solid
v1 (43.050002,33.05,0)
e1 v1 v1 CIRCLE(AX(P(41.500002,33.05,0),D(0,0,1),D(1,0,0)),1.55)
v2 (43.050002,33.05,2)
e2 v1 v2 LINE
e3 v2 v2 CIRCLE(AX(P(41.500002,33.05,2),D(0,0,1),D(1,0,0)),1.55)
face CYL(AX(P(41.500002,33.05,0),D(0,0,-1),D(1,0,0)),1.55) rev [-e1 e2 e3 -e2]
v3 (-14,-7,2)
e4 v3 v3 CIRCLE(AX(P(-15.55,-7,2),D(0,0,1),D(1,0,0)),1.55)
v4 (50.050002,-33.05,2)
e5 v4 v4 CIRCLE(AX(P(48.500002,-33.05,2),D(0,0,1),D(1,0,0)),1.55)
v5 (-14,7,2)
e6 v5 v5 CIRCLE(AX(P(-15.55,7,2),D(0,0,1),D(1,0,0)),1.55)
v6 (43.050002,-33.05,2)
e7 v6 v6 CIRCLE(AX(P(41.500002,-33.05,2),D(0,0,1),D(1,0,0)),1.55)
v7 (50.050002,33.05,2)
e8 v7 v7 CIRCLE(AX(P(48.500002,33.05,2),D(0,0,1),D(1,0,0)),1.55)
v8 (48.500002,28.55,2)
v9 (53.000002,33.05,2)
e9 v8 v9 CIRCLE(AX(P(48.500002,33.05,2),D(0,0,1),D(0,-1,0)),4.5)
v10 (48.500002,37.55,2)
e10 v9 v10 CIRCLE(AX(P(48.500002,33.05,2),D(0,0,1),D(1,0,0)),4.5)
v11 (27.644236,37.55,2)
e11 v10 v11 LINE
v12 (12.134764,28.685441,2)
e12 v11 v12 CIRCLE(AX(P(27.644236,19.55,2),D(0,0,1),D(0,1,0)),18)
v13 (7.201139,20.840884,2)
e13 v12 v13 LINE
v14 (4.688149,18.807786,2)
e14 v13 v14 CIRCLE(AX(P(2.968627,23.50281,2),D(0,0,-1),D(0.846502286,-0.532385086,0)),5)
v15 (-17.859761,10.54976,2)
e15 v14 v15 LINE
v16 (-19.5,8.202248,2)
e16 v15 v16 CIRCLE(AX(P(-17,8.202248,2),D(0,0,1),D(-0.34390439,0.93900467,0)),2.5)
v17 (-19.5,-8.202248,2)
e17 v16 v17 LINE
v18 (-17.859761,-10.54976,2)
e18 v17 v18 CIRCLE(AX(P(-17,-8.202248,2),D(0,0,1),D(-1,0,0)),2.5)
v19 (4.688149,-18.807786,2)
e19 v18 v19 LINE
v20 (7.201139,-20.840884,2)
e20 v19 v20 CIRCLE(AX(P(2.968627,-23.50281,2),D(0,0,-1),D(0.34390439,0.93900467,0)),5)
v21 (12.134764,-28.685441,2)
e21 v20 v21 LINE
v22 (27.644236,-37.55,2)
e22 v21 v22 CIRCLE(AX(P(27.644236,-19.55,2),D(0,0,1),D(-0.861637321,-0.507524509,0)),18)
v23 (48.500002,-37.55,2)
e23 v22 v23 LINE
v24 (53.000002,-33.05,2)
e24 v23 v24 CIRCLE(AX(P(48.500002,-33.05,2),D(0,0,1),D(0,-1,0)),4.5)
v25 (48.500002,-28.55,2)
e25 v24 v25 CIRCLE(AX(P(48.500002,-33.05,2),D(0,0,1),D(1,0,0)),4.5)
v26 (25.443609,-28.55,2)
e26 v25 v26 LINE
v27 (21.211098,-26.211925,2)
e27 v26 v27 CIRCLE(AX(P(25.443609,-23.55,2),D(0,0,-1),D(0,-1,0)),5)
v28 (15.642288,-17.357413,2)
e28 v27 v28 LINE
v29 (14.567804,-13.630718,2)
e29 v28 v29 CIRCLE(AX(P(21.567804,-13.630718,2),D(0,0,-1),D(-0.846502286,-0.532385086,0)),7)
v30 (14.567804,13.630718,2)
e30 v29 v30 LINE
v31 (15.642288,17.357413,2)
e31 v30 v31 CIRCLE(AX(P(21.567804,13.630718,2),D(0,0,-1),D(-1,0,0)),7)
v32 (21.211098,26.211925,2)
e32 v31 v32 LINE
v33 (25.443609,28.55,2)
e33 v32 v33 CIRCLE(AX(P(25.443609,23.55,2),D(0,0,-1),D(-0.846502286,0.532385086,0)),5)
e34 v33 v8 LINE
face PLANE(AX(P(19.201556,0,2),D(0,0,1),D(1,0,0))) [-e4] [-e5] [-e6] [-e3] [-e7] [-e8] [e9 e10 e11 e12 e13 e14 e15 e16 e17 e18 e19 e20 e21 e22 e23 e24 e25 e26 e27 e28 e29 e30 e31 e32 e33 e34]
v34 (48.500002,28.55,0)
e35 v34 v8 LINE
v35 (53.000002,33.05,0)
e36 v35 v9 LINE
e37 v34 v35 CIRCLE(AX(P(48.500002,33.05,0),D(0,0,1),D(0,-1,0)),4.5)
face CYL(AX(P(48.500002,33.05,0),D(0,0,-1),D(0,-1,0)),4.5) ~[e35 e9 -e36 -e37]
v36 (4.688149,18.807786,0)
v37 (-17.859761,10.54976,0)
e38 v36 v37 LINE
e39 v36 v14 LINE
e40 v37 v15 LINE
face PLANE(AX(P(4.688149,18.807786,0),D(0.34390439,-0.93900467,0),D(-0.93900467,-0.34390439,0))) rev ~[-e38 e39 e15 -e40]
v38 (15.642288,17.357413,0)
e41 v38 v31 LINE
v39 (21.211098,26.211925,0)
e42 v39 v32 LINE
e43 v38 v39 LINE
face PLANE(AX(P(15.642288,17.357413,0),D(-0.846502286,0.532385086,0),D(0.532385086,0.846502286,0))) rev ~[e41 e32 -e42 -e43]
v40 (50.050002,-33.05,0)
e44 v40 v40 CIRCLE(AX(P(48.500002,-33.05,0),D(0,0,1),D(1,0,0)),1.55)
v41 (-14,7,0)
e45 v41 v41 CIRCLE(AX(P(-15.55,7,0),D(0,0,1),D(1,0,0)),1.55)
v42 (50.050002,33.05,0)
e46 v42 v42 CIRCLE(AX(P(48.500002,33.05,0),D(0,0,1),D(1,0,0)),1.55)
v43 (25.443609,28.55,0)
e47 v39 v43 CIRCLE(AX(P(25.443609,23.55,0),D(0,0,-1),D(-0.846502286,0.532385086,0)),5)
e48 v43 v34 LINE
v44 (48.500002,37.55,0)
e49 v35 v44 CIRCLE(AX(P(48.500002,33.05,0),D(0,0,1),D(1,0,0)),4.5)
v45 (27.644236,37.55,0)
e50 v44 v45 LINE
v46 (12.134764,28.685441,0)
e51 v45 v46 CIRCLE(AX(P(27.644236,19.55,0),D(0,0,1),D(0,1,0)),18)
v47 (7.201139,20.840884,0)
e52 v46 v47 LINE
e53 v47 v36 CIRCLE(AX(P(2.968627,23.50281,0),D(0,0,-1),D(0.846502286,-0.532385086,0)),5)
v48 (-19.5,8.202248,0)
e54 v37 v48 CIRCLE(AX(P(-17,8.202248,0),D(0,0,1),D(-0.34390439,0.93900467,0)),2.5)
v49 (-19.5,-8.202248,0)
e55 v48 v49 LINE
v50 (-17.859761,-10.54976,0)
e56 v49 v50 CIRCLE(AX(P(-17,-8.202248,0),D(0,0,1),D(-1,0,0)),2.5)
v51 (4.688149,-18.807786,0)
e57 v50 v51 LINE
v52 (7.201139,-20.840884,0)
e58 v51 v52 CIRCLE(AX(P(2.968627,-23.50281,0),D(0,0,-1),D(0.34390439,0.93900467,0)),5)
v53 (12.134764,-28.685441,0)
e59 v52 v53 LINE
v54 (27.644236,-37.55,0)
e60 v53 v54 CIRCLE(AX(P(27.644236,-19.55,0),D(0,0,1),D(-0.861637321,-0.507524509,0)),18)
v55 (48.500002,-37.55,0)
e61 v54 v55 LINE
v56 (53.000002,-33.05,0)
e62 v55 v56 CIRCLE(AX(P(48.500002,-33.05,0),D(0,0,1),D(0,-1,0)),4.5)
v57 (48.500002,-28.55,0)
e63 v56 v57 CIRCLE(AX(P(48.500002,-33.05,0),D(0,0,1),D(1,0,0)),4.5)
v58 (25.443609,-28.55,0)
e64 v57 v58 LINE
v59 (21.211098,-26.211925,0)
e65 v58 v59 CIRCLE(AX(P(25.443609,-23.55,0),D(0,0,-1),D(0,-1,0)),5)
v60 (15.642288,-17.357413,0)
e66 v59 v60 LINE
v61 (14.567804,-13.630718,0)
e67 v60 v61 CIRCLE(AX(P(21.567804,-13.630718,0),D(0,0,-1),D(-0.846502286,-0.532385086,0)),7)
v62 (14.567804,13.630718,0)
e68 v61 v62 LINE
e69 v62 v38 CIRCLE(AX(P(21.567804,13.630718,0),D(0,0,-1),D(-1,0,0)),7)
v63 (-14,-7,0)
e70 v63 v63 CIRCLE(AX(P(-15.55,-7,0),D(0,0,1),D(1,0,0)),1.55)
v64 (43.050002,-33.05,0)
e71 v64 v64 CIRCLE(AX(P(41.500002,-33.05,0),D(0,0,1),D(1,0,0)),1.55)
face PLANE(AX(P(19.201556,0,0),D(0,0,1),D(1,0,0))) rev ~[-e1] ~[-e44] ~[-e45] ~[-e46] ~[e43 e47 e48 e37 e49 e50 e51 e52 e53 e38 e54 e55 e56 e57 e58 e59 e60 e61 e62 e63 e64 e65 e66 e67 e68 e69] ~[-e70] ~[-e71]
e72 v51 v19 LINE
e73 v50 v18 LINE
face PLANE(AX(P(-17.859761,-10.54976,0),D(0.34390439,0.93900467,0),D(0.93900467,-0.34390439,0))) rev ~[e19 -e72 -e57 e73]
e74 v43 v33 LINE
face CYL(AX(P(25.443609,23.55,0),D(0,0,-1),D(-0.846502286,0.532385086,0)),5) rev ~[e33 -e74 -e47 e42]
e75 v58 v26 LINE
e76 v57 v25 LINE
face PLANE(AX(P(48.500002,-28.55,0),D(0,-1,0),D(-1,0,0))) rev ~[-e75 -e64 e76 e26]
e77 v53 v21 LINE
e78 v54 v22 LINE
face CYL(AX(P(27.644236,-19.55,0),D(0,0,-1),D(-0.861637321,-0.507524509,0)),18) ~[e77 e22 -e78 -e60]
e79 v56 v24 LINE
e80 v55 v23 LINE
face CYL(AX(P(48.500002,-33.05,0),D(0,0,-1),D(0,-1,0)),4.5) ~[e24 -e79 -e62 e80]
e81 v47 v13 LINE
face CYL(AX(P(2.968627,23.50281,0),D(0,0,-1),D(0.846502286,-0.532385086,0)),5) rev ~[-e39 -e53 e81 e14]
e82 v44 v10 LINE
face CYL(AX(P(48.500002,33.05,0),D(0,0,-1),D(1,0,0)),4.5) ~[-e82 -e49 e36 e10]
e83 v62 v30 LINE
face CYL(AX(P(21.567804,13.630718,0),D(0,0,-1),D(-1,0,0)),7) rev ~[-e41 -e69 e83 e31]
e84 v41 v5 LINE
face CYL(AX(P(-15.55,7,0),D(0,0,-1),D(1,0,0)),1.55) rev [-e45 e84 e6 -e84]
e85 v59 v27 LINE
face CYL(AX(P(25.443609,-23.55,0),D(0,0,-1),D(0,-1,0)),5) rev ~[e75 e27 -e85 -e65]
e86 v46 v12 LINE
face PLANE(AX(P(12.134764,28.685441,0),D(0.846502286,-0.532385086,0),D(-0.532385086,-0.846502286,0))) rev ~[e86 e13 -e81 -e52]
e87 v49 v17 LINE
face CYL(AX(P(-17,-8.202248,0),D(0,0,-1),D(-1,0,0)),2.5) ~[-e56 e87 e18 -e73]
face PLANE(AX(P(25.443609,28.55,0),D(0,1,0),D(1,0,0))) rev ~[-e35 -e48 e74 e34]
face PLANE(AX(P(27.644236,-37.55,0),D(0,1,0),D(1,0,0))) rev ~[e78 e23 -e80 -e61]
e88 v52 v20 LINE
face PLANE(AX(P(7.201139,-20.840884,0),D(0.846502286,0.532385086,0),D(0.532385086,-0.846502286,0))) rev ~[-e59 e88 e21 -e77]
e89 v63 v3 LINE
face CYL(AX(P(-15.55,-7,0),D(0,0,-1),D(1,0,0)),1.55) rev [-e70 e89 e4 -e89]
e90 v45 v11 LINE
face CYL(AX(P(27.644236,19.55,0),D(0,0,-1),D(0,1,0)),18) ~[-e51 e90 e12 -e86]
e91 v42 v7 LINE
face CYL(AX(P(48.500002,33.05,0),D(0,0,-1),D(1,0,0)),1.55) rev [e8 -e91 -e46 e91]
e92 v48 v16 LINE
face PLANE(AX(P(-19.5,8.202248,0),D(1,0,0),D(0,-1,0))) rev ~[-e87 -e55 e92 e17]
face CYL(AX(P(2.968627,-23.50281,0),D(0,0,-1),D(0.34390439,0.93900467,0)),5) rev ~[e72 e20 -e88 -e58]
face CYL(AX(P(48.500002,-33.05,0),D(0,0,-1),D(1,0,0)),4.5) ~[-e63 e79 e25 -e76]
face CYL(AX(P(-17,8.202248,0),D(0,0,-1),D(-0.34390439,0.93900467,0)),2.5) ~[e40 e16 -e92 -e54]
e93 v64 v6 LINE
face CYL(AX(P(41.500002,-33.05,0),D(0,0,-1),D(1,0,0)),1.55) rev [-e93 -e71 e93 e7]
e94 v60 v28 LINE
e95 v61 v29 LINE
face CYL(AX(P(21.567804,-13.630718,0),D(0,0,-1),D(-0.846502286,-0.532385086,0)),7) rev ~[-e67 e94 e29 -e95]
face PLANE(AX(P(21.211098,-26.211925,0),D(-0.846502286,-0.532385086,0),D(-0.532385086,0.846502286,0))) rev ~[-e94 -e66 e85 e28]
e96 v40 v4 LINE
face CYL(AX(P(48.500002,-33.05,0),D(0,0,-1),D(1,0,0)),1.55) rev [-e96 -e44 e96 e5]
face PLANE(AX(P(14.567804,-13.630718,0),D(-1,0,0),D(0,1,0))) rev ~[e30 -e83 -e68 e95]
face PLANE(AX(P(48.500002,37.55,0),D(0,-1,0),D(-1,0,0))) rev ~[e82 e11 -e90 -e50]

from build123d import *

# Parameters (mm, degrees)
F0_R     = 1.55
F1_DEPTH = 2


# Not quite as in the source:
# - a feature names something its author has since deleted; it is built from what else it names


with BuildPart() as f1:
    # F0 (on Top) → F1 (new body)
    with BuildSketch(Plane.XY):
        with BuildLine():
            Line((25.4436091884, 28.55), (48.5000015985, 28.55))
            ThreePointArc((48.5000015985, 28.55), (51.6819821139, 29.8680194847), (53.0000015985, 33.05))
            ThreePointArc((53.0000015985, 33.05), (51.6819821139, 36.2319805153), (48.5000015985, 37.55))
            Line((48.5000015985, 37.55), (27.6442359668, 37.55))
            ThreePointArc((27.6442359668, 37.55), (18.7122132684, 35.1775068554), (12.1347641944, 28.6854411684))
            Line((12.1347641944, 28.6854411684), (7.2011388972, 20.8408842798))
            ThreePointArc((7.2011388972, 20.8408842798), (6.1134719977, 19.6156574256), (4.6881494145, 18.8077863577))
            Line((4.6881494145, 18.8077863577), (-17.8597609739, 10.5497599571))
            ThreePointArc((-17.8597609739, 10.5497599571), (-19.0493172564, 9.6341347233), (-19.5, 8.2022482814))
            Line((-19.5, 8.2022482814), (-19.5, -8.2022482814))
            ThreePointArc((-19.5, -8.2022482814), (-19.0493172564, -9.6341347233), (-17.8597609739, -10.5497599571))
            Line((-17.8597609739, -10.5497599571), (4.6881494145, -18.8077863577))
            ThreePointArc((4.6881494145, -18.8077863577), (6.1134719977, -19.6156574256), (7.2011388972, -20.8408842798))
            Line((7.2011388972, -20.8408842798), (12.1347641944, -28.6854411684))
            ThreePointArc((12.1347641944, -28.6854411684), (18.7122132684, -35.1775068554), (27.6442359668, -37.55))
            Line((27.6442359668, -37.55), (48.5000015985, -37.55))
            ThreePointArc((48.5000015985, -37.55), (51.6819821139, -36.2319805153), (53.0000015985, -33.05))
            ThreePointArc((53.0000015985, -33.05), (51.6819821139, -29.8680194847), (48.5000015985, -28.55))
            Line((48.5000015985, -28.55), (25.4436091884, -28.55))
            ThreePointArc((25.4436091884, -28.55), (23.0259271525, -27.9266212509), (21.211097758, -26.2119254294))
            Line((21.211097758, -26.2119254294), (15.6422879472, -17.3574132338))
            ThreePointArc((15.6422879472, -17.3574132338), (14.8417868513, -15.5699685166), (14.5678039498, -13.6307176327))
            Line((14.5678039498, -13.6307176327), (14.5678039498, 13.6307176327))
            ThreePointArc((14.5678039498, 13.6307176327), (14.8417868513, 15.5699685166), (15.6422879472, 17.3574132338))
            Line((15.6422879472, 17.3574132338), (21.211097758, 26.2119254294))
            ThreePointArc((21.211097758, 26.2119254294), (23.0259271525, 27.9266212509), (25.4436091884, 28.55))
        make_face()
        with Locations((-15.55, -7)):
            Circle(F0_R, mode=Mode.SUBTRACT)
        with Locations((41.5000015985, -33.05)):
            Circle(F0_R, mode=Mode.SUBTRACT)
        with Locations((48.5000015985, -33.05)):
            Circle(F0_R, mode=Mode.SUBTRACT)
        with Locations((-15.55, 7)):
            Circle(F0_R, mode=Mode.SUBTRACT)
        with Locations((41.5000015985, 33.05)):
            Circle(F0_R, mode=Mode.SUBTRACT)
        with Locations((48.5000015985, 33.05)):
            Circle(F0_R, mode=Mode.SUBTRACT)
    extrude(amount=F1_DEPTH)


solid = f1.part
